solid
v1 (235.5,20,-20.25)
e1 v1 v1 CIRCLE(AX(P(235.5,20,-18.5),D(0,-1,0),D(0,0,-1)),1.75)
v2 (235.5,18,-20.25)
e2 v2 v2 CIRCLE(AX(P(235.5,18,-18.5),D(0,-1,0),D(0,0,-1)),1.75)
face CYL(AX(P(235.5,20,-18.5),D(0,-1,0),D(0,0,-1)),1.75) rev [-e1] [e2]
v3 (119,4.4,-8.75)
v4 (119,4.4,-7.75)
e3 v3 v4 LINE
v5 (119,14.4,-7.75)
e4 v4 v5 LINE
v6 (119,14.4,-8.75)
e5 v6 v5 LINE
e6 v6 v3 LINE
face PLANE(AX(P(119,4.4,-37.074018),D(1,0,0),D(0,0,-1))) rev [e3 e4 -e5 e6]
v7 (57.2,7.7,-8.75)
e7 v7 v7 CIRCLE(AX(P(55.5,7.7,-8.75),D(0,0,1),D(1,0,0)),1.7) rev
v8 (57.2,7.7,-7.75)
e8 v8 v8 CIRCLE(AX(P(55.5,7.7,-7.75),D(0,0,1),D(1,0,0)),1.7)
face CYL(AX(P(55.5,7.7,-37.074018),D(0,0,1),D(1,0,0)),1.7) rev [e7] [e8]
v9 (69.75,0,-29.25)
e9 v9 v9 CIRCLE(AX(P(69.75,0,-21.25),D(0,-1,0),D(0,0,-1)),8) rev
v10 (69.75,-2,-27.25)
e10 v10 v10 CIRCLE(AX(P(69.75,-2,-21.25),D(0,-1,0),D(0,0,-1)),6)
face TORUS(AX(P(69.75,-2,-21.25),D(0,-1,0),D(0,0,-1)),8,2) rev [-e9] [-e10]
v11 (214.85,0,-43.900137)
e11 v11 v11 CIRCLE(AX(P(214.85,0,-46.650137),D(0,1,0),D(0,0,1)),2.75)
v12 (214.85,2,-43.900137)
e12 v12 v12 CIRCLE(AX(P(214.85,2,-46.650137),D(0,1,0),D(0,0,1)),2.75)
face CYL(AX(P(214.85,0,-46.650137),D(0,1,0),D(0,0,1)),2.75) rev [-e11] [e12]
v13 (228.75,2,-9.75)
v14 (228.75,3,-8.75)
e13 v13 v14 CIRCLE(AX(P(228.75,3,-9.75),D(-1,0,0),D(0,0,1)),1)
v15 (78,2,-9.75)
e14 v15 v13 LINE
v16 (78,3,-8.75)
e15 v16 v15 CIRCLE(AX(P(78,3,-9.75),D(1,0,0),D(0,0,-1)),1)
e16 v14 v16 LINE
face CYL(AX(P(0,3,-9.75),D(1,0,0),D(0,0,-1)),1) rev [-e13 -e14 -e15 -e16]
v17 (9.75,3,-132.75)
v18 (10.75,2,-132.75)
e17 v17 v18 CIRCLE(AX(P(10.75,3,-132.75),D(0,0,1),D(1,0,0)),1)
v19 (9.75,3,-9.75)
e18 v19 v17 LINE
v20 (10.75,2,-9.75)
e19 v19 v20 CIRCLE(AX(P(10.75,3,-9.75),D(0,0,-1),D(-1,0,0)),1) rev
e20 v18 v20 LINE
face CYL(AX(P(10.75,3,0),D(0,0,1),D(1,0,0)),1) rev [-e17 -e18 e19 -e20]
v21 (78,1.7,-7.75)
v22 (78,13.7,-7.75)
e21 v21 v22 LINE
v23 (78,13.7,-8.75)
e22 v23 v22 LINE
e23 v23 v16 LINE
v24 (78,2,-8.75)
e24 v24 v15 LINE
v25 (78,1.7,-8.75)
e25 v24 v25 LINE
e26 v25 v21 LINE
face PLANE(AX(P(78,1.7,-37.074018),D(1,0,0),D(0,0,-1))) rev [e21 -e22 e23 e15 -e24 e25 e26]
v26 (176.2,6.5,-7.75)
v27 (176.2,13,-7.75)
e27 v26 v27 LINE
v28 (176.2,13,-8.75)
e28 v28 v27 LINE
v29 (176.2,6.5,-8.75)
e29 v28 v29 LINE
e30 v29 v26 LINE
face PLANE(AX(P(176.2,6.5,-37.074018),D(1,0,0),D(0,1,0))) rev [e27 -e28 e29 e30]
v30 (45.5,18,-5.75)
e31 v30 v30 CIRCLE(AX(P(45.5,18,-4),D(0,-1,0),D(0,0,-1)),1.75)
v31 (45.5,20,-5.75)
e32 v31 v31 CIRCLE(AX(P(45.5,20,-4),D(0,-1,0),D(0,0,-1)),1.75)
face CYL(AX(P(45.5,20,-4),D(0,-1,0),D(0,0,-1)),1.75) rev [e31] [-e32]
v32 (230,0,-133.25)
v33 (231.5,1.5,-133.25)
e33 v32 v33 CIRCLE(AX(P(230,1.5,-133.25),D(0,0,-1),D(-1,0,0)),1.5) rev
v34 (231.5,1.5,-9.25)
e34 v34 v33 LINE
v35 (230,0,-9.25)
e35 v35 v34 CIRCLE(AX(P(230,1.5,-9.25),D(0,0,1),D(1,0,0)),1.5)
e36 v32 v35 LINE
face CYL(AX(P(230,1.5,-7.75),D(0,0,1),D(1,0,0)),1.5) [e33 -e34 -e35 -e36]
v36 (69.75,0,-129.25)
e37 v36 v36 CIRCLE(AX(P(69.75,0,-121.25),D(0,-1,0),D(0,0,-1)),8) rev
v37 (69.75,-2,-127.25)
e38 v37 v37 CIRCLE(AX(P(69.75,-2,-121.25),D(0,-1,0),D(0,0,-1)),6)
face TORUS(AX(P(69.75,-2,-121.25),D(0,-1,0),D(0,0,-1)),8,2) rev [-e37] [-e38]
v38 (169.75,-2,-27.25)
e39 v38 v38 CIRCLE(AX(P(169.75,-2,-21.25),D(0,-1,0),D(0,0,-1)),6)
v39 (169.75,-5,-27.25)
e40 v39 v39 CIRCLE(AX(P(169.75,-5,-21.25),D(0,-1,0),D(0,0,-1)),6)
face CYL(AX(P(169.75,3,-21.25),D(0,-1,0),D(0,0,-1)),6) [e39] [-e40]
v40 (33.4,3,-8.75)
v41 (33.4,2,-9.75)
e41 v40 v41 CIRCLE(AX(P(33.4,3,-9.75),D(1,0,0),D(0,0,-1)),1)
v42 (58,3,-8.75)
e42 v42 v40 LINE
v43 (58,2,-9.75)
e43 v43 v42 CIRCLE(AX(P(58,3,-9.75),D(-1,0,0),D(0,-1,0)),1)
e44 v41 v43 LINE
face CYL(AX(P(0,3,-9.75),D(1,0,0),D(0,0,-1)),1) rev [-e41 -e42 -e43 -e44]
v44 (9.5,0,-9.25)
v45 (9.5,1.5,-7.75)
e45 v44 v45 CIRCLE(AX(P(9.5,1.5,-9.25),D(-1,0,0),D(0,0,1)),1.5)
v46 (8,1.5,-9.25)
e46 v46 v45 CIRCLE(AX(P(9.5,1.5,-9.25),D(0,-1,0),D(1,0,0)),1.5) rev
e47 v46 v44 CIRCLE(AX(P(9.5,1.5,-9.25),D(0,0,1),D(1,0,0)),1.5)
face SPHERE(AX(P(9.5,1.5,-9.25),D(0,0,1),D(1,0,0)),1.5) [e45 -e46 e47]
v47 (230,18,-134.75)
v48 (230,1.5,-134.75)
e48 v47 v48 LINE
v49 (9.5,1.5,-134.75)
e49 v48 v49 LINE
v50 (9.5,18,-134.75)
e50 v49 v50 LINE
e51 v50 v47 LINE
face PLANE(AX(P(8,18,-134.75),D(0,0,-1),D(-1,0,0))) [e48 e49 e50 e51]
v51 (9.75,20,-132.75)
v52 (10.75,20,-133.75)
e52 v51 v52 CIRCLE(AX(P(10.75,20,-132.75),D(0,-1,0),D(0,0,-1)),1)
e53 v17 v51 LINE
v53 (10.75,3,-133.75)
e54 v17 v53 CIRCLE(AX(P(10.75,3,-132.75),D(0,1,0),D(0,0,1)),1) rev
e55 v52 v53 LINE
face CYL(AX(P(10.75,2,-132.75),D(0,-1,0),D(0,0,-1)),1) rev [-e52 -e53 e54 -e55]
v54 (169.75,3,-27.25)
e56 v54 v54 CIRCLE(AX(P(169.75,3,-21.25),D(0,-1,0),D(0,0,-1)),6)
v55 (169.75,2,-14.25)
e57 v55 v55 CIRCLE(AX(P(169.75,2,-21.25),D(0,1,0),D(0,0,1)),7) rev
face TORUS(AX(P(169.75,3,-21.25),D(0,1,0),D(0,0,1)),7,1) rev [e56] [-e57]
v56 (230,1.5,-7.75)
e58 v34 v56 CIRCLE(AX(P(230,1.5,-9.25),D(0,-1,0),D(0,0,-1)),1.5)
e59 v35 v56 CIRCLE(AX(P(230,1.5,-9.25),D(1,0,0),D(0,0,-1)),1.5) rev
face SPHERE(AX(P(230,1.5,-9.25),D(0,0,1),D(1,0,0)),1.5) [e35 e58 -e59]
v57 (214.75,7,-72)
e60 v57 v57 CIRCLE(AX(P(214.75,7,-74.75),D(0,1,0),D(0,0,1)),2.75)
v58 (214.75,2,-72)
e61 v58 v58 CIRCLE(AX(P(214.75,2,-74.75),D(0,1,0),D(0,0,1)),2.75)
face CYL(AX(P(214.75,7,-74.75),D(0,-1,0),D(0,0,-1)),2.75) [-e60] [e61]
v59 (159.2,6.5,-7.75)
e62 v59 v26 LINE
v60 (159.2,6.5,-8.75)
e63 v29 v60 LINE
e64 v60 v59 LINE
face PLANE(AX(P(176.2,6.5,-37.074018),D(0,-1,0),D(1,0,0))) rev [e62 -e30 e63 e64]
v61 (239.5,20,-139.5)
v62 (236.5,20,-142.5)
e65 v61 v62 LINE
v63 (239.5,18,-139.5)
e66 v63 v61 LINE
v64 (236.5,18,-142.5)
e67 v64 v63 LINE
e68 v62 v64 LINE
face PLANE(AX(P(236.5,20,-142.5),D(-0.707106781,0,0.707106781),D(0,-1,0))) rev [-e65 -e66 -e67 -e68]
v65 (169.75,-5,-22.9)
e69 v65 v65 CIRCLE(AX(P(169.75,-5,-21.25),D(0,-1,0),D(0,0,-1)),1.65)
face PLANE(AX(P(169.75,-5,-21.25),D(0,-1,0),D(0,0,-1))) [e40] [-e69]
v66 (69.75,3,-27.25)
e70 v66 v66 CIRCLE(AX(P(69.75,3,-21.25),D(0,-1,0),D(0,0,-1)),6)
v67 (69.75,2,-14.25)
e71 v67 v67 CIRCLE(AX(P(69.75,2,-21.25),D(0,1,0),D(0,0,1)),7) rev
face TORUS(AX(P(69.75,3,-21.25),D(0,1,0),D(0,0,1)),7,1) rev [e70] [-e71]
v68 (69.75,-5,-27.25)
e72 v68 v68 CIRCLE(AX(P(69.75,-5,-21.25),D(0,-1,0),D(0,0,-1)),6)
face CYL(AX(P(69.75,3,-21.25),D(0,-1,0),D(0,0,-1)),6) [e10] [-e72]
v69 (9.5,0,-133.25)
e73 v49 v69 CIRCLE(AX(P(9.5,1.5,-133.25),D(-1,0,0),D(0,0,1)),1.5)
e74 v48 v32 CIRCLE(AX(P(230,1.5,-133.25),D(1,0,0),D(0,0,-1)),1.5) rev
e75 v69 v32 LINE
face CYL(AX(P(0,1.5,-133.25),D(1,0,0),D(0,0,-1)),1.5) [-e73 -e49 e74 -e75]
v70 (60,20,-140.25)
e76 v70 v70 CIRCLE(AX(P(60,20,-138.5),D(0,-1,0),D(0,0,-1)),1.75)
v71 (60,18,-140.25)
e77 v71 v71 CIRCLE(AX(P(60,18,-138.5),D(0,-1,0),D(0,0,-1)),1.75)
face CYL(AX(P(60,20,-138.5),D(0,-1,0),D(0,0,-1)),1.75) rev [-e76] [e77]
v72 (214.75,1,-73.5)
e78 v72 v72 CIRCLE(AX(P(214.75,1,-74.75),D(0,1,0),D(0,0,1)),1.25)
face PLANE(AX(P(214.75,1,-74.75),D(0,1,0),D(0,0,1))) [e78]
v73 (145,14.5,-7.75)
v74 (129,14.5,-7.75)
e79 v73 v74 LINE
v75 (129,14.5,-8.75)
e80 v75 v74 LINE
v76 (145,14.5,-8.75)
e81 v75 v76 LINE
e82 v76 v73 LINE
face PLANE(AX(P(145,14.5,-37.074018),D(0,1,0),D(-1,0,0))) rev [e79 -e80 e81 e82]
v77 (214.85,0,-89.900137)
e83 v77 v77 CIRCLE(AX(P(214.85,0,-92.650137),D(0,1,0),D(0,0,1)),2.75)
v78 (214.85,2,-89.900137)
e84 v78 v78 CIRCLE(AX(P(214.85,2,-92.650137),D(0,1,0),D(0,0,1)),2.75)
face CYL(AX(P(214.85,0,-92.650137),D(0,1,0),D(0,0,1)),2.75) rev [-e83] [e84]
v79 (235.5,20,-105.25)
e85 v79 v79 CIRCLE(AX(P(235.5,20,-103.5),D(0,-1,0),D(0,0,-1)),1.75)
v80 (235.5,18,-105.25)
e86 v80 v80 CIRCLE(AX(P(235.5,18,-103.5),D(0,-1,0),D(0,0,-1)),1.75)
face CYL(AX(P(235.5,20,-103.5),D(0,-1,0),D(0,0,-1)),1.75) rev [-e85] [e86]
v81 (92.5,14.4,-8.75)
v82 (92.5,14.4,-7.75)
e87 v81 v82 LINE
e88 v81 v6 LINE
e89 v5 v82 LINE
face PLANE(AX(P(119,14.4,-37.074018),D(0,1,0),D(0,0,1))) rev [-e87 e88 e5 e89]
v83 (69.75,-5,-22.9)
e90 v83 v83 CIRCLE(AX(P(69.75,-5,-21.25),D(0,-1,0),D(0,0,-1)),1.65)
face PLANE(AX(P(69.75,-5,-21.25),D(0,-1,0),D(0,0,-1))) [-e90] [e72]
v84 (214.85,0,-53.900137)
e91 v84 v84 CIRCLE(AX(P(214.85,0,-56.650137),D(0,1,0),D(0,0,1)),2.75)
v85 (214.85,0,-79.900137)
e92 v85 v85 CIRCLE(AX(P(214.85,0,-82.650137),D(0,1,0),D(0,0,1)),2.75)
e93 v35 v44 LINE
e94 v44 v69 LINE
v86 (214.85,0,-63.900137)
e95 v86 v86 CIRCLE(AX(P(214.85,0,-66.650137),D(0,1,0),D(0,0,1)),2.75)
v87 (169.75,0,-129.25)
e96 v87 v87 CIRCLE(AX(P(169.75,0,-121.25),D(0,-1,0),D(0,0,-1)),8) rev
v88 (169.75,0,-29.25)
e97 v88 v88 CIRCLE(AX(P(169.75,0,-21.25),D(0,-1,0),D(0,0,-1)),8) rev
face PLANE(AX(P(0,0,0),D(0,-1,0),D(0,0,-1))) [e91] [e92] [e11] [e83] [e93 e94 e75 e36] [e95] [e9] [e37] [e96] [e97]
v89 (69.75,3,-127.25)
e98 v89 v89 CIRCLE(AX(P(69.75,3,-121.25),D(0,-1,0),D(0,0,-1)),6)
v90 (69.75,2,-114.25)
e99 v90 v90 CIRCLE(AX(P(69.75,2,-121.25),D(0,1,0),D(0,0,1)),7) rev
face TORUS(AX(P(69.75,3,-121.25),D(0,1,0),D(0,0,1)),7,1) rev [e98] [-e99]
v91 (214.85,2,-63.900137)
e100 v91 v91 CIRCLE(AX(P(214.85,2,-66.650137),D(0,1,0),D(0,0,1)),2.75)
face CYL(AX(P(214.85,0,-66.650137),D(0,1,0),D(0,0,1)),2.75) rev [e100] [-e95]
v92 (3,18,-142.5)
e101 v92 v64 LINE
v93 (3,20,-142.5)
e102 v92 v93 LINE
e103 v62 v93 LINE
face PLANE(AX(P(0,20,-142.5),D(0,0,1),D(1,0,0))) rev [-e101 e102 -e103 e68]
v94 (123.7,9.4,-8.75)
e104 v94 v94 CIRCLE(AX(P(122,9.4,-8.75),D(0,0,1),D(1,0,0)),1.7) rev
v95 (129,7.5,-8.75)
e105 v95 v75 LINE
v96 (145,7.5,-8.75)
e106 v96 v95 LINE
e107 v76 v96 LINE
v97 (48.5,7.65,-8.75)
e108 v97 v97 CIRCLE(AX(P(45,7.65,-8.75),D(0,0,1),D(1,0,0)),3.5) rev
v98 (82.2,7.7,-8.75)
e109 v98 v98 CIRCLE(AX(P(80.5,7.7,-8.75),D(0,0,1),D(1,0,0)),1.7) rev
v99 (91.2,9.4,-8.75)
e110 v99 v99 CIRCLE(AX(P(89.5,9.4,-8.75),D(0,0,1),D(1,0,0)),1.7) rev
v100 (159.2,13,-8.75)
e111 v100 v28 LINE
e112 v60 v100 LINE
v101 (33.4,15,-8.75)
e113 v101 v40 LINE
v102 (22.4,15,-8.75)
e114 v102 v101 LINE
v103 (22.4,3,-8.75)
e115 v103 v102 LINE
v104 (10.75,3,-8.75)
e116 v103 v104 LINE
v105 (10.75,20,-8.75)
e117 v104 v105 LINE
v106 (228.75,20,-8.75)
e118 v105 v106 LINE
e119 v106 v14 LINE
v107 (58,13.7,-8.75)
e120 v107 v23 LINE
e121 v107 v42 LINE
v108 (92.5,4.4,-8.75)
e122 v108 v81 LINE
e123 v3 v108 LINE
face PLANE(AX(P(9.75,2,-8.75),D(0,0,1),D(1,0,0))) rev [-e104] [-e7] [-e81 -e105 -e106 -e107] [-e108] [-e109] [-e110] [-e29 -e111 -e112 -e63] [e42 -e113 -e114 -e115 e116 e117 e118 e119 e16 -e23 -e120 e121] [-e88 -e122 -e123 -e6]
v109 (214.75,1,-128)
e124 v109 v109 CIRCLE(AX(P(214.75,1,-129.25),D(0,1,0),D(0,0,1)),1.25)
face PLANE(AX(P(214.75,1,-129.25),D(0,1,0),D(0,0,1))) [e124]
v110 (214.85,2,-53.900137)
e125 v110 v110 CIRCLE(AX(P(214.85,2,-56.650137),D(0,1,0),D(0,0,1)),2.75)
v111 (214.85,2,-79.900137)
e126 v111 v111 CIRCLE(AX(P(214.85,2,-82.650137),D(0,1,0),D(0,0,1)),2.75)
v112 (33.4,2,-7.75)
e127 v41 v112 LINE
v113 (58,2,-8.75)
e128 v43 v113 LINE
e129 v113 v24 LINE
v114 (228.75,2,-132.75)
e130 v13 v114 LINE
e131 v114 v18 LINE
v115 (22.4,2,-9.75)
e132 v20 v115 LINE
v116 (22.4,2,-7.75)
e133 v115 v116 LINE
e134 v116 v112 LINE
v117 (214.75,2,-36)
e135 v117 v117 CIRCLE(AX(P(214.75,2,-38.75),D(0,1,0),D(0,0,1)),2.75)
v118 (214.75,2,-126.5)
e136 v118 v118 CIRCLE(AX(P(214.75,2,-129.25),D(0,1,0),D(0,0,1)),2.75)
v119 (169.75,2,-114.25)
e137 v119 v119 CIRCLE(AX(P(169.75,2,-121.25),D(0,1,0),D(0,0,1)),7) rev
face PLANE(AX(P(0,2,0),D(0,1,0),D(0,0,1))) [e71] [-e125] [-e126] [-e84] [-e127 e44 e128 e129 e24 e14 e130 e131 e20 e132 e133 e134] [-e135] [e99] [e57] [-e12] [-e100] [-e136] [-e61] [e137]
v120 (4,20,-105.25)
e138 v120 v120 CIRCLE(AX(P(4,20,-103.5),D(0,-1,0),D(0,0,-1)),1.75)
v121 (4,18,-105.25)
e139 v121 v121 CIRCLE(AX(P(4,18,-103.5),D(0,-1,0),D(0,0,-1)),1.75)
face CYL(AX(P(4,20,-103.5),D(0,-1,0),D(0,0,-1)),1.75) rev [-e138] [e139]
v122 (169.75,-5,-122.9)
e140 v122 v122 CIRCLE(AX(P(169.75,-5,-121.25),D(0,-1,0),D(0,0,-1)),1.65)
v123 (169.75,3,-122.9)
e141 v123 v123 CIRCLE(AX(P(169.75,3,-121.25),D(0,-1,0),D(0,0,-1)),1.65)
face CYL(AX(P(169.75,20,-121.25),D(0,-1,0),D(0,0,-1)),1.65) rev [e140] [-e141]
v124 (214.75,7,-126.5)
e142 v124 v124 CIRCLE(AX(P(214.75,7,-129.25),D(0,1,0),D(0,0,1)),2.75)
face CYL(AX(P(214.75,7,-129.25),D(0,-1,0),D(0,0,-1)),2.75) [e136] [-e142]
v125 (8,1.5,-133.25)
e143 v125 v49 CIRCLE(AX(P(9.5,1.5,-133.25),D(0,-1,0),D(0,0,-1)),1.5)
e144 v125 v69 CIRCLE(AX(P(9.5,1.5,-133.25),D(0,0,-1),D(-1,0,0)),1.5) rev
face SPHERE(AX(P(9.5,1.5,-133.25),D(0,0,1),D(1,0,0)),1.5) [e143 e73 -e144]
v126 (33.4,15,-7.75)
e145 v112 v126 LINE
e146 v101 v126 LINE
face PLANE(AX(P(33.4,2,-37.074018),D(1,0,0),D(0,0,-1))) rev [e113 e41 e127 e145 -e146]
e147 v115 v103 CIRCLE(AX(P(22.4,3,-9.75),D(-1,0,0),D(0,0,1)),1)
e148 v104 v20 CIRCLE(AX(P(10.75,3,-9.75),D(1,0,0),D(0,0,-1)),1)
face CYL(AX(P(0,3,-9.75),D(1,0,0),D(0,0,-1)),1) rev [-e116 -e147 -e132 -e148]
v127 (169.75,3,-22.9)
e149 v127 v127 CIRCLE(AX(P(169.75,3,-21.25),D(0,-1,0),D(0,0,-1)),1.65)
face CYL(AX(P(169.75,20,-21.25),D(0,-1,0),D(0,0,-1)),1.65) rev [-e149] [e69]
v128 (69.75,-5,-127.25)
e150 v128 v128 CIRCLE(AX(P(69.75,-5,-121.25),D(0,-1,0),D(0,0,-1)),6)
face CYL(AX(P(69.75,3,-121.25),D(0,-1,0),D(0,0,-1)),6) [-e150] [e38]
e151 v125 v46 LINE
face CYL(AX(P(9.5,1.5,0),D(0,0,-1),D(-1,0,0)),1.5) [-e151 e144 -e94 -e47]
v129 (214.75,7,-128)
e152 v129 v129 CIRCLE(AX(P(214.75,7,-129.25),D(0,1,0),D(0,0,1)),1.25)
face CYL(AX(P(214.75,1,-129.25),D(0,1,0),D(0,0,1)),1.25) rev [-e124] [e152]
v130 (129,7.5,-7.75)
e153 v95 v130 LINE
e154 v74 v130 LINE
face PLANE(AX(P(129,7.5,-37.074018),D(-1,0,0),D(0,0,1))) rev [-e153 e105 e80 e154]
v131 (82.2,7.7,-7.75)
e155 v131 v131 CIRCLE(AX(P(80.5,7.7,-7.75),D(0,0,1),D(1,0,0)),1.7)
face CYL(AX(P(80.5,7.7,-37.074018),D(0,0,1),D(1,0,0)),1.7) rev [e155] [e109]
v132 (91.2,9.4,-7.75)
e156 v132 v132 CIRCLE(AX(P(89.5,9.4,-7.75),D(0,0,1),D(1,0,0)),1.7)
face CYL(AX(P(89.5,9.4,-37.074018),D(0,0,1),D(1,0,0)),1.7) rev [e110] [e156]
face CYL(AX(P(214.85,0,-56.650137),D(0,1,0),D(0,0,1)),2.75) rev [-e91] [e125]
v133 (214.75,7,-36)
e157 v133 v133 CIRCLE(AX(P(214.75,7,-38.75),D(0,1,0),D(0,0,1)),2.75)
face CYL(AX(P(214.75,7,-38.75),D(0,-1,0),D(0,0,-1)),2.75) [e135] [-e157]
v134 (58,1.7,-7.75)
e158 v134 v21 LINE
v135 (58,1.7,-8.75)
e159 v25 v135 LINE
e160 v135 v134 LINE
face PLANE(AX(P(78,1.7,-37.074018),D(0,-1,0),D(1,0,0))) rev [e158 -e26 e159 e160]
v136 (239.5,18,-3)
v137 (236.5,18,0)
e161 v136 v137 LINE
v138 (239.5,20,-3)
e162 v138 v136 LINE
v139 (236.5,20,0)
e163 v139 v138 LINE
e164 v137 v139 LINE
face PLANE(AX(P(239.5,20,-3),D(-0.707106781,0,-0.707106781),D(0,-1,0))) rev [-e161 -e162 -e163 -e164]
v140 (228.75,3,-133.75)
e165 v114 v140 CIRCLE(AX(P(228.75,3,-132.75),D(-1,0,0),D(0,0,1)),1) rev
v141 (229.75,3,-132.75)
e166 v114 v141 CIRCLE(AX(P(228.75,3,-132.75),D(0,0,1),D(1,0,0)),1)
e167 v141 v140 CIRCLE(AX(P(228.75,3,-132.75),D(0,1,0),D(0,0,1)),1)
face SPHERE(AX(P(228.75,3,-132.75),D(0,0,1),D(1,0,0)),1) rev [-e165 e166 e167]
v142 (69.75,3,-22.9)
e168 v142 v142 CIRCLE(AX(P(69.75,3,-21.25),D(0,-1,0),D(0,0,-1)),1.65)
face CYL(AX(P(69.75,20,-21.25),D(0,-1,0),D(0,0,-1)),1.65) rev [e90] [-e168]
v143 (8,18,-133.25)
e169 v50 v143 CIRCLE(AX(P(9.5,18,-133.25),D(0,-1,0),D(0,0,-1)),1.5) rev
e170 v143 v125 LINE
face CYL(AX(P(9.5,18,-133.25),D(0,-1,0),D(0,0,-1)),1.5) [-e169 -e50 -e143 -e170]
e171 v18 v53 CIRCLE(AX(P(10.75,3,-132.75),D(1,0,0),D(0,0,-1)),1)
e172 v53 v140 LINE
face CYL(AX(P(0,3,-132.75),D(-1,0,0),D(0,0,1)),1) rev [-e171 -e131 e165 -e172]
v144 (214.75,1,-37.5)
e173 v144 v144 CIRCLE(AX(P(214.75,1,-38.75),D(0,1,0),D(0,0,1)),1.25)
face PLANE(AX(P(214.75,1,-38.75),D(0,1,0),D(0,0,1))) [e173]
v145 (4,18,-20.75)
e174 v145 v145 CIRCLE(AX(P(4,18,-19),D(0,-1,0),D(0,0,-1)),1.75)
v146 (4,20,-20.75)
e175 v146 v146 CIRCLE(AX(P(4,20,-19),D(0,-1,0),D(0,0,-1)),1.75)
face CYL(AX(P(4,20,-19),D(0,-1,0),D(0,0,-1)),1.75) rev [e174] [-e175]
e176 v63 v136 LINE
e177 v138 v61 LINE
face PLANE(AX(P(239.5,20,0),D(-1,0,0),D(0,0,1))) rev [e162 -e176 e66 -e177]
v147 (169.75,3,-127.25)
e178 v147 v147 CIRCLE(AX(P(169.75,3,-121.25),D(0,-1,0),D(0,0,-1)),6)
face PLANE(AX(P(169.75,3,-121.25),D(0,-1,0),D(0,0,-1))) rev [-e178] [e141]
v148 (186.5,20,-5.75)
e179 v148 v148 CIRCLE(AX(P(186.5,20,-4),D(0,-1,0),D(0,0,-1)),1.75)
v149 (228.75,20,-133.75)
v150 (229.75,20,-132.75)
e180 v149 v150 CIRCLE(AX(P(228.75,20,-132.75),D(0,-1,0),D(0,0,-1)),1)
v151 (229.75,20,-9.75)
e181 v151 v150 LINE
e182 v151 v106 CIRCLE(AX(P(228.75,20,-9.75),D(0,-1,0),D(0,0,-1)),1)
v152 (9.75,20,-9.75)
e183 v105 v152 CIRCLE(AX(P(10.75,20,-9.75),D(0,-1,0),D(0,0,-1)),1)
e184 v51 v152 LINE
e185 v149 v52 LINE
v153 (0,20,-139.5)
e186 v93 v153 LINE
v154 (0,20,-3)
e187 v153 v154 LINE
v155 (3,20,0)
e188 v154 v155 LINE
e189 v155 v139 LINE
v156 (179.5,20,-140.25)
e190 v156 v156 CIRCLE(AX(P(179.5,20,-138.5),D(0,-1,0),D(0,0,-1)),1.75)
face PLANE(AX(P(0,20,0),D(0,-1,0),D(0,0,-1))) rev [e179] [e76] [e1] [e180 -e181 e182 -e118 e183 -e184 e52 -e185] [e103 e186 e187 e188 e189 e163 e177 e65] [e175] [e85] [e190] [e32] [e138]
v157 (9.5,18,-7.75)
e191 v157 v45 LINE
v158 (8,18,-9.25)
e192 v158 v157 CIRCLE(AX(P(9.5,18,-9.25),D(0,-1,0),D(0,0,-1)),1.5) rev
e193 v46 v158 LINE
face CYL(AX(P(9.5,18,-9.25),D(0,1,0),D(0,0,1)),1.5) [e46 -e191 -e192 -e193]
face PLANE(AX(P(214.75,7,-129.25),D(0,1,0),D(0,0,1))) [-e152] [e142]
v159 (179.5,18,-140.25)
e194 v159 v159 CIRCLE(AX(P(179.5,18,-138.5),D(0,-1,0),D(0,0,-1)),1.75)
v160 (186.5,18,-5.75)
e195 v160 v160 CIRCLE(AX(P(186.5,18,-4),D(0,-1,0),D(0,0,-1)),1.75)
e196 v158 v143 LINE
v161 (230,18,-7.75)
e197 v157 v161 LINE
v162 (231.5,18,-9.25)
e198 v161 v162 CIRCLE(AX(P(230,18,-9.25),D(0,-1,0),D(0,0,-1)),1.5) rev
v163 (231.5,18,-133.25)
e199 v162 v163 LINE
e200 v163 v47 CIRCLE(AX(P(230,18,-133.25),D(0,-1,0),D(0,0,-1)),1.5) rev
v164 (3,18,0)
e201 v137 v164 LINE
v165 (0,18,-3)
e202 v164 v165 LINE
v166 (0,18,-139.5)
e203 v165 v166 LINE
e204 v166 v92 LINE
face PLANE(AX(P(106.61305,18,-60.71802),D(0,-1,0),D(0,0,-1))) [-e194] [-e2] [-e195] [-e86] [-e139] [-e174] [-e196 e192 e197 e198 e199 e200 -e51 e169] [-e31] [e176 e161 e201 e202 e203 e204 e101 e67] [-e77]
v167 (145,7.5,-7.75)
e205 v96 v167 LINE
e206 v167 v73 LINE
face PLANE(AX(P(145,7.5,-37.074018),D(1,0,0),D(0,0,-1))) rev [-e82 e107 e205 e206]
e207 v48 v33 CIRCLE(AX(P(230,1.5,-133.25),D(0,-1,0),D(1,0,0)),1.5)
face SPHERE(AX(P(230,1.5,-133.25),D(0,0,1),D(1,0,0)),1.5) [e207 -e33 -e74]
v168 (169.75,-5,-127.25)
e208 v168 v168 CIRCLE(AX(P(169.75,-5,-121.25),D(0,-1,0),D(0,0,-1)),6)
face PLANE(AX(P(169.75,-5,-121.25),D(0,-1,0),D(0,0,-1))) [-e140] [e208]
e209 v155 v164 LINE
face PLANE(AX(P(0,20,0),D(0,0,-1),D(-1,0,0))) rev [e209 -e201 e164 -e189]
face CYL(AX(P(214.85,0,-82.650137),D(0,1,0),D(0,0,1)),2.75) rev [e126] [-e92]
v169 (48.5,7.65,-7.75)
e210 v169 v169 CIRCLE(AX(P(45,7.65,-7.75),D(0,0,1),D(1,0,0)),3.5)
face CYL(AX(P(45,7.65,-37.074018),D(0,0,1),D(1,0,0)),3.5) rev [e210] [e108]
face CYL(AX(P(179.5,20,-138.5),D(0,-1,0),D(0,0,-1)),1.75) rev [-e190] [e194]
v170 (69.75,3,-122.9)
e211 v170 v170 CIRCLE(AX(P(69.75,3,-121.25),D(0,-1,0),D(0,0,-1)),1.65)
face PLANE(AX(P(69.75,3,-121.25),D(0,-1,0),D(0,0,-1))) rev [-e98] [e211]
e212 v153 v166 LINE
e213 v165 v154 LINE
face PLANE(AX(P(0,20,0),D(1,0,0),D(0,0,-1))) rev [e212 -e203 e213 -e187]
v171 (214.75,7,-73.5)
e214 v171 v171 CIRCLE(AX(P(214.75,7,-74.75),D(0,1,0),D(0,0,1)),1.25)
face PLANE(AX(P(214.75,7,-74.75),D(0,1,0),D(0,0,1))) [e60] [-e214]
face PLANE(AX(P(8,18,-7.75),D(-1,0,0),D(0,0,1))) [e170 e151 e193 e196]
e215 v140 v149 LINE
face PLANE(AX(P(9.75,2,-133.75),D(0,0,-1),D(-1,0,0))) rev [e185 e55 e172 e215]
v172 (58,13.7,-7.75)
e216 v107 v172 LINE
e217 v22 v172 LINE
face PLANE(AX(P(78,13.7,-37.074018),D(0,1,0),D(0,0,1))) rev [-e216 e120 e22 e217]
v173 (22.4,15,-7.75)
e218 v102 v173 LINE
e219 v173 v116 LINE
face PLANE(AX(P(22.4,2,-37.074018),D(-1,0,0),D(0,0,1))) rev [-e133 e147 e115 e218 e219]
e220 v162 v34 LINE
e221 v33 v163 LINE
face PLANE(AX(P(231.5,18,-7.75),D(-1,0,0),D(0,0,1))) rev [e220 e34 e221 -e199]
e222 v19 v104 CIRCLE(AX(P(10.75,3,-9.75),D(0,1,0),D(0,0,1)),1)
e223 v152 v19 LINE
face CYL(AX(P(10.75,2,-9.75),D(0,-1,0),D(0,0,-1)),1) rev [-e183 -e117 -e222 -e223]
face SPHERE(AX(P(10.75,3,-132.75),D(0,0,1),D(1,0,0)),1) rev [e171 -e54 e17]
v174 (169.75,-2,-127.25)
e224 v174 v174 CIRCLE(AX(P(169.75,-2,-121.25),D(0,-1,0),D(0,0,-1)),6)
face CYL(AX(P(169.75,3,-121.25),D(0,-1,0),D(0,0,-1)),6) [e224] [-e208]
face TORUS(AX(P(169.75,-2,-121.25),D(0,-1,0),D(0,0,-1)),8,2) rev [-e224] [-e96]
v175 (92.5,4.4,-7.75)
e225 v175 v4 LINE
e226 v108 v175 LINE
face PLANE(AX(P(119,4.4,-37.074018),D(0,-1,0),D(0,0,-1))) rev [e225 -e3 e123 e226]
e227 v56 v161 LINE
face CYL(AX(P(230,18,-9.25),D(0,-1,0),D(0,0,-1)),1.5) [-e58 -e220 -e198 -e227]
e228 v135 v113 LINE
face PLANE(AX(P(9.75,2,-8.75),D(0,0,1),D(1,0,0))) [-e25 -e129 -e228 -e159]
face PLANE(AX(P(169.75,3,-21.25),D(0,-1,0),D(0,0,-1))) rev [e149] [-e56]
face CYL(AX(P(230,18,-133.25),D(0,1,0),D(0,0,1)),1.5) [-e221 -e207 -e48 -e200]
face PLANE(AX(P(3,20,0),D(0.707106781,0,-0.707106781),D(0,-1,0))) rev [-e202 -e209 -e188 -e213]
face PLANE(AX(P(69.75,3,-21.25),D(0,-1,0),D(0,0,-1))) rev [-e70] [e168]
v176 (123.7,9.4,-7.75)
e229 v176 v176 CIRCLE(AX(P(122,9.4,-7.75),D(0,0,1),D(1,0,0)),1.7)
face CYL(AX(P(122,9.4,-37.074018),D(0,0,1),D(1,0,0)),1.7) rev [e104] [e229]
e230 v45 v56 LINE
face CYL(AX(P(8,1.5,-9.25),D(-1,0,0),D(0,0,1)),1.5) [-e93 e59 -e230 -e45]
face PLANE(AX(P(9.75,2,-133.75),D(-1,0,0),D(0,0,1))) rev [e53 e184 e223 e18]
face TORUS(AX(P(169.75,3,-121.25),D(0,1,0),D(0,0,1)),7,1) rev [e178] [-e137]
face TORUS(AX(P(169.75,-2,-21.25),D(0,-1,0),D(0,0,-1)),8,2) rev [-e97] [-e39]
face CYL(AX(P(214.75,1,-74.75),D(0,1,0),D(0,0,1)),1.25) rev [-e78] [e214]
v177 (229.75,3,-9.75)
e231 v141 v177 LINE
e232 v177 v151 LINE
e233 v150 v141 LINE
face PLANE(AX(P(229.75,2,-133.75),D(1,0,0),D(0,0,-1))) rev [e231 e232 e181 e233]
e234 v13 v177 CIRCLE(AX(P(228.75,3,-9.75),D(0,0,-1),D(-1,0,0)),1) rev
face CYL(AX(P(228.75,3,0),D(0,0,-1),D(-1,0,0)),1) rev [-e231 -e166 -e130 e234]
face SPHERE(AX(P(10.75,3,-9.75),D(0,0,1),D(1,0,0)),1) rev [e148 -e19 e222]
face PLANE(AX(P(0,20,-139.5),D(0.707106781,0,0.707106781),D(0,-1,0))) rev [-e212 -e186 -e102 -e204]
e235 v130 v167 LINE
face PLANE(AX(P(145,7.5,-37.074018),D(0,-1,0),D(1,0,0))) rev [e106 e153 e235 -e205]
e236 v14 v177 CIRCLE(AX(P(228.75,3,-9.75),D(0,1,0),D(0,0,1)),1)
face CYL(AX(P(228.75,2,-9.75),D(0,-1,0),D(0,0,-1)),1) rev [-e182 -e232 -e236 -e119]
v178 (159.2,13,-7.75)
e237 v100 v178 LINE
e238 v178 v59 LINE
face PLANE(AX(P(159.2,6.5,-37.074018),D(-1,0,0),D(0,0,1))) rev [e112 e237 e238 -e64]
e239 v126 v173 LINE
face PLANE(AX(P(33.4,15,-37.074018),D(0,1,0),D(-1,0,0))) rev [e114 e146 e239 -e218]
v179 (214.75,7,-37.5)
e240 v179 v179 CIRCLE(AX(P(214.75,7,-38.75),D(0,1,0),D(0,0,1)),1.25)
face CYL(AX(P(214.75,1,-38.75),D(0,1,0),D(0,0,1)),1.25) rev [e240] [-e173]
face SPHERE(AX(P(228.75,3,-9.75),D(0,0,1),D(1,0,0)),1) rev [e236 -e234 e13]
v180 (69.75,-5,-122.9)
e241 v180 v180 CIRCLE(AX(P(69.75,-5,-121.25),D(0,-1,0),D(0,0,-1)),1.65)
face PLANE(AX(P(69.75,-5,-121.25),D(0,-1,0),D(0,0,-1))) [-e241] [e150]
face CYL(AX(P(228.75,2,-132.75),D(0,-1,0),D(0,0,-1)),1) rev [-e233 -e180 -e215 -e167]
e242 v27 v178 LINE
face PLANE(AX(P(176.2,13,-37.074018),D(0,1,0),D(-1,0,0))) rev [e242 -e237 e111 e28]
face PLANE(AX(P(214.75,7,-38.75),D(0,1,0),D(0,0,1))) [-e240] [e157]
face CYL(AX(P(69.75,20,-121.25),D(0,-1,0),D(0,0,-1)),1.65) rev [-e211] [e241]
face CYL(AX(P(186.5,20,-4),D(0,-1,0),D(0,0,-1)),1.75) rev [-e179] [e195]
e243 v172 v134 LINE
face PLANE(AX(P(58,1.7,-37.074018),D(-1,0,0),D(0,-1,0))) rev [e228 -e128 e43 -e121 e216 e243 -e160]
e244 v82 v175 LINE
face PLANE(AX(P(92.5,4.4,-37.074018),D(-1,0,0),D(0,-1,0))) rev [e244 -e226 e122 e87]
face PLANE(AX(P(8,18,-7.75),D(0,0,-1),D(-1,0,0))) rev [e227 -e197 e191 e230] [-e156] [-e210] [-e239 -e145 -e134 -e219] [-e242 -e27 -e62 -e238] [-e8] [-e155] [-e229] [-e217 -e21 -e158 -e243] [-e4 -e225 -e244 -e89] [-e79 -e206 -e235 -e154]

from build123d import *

# Parameters (mm, degrees)
SKETCH1_W                = 239.5
SKETCH1_H                = 142.5
BOSS_EXTRUDE1_DEPTH      = 20
SKETCH2_OUTSIDE_W        = 297.38
SKETCH2_OUTSIDE_H        = 200.38
SKETCH2_OUTSIDE_W_2      = 223.5
SKETCH2_OUTSIDE_H_2      = 127
CUT_EXTRUDE1_DEPTH       = 18
SKETCH3_W                = 220
SKETCH3_H                = 125
CUT_EXTRUDE2_DEPTH       = 18
SKETCH4_R                = 2.75
BOSS_EXTRUDE3_DEPTH      = 5
SKETCH5_R                = 1.25
CUT_EXTRUDE3_DEPTH       = 6
SKETCH6_R                = 2.75
CUT_EXTRUDE4_DEPTH       = 280.267792629
SKETCH7_R                = 1.75
CUT_EXTRUDE5_DEPTH       = 280.267792629
SKETCH8_R                = 1.7
SKETCH8_R_2              = 3.5
SKETCH8_W                = 17
SKETCH8_H                = 6.5
SKETCH8_W_2              = 16
SKETCH8_H_2              = 7
SKETCH8_W_3              = 26.5
SKETCH8_H_3              = 10
SKETCH8_W_4              = 20
SKETCH8_H_4              = 12
SKETCH8_W_5              = 11
SKETCH8_H_5              = 13
CUT_EXTRUDE6_DEPTH       = 1
CHAMFER1_SIZE            = 3
BOSS_EXTRUDE4_DEPTH      = 5
BOSS_EXTRUDE4_DEPTH_BACK = 3
SKETCH9_R                = 6
SKETCH10_R               = 1.65
CUT_EXTRUDE7_DEPTH       = 280.80618292
FILLET1_R                = 2
FILLET2_R                = 1
FILLET3_R                = 1.5
FILLET4_R                = 1


with BuildPart() as part:
    # Sketch1 → Boss-Extrude1 (new body)
    with BuildSketch(Plane(origin=(0, 0, 0), x_dir=(1, 0, 0), z_dir=(0, 1, 0))):
        with Locations((119.75, 71.25)):
            Rectangle(SKETCH1_W, SKETCH1_H)
    extrude(amount=BOSS_EXTRUDE1_DEPTH)

    # Sketch2 outside → Cut-Extrude1 (cut)
    with BuildSketch(Plane.XZ):
        with Locations((119.75, -71.25)):
            Rectangle(SKETCH2_OUTSIDE_W, SKETCH2_OUTSIDE_H)
        with Locations((119.75, -71.25)):
            Rectangle(SKETCH2_OUTSIDE_W_2, SKETCH2_OUTSIDE_H_2, mode=Mode.SUBTRACT)
    extrude(amount=-CUT_EXTRUDE1_DEPTH, mode=Mode.SUBTRACT)

    # Sketch3 → Cut-Extrude2 (cut)
    with BuildSketch(Plane(origin=(0, 20, 0), x_dir=(1, 0, 0), z_dir=(0, 1, 0))):
        with Locations((119.75, 71.25)):
            Rectangle(SKETCH3_W, SKETCH3_H)
    extrude(amount=-CUT_EXTRUDE2_DEPTH, mode=Mode.SUBTRACT)

    # Sketch4 → Boss-Extrude3 (add)
    with BuildSketch(Plane(origin=(0, 2, 0), x_dir=(1, 0, 0), z_dir=(0, 1, 0))):
        with Locations(Location((214.75, 129.25, 0), (0, 0, 270))):
            Circle(SKETCH4_R)
        with Locations(Location((214.75, 74.75, 0), (0, 0, 270))):
            Circle(SKETCH4_R)
        with Locations(Location((214.75, 38.75, 0), (0, 0, 270))):
            Circle(SKETCH4_R)
    extrude(amount=BOSS_EXTRUDE3_DEPTH)

    # Sketch5 → Cut-Extrude3 (cut)
    with BuildSketch(Plane(origin=(0, 7, 0), x_dir=(1, 0, 0), z_dir=(0, 1, 0))):
        with Locations(Location((214.75, 129.25, 0), (0, 0, 270))):
            Circle(SKETCH5_R)
        with Locations(Location((214.75, 74.75, 0), (0, 0, 270))):
            Circle(SKETCH5_R)
        with Locations(Location((214.75, 38.75, 0), (0, 0, 270))):
            Circle(SKETCH5_R)
    extrude(amount=-CUT_EXTRUDE3_DEPTH, mode=Mode.SUBTRACT)

    # Sketch6 → Cut-Extrude4 (cut, through all)
    with BuildSketch(Plane(origin=(0, 2, 0), x_dir=(1, 0, 0), z_dir=(0, 1, 0))):
        with Locations(Location((214.85, 92.650136612, 0), (0, 0, 270))):
            Circle(SKETCH6_R)
        with Locations(Location((214.85, 82.650136612, 0), (0, 0, 270))):
            Circle(SKETCH6_R)
        with Locations(Location((214.85, 66.650136612, 0), (0, 0, 270))):
            Circle(SKETCH6_R)
        with Locations(Location((214.85, 56.650136612, 0), (0, 0, 270))):
            Circle(SKETCH6_R)
        with Locations(Location((214.85, 46.650136612, 0), (0, 0, 270))):
            Circle(SKETCH6_R)
    extrude(amount=-CUT_EXTRUDE4_DEPTH, mode=Mode.SUBTRACT)

    # Sketch7 → Cut-Extrude5 (cut, through all)
    with BuildSketch(Plane.XZ.offset(-18)):
        with Locations(Location((179.5, -138.5, 0), (0, 0, 270))):
            Circle(SKETCH7_R)
        with Locations(Location((60, -138.5, 0), (0, 0, 270))):
            Circle(SKETCH7_R)
        with Locations(Location((235.5, -103.5, 0), (0, 0, 270))):
            Circle(SKETCH7_R)
        with Locations(Location((235.5, -18.5, 0), (0, 0, 270))):
            Circle(SKETCH7_R)
        with Locations(Location((186.5, -4, 0), (0, 0, 270))):
            Circle(SKETCH7_R)
        with Locations(Location((45.5, -4, 0), (0, 0, 270))):
            Circle(SKETCH7_R)
        with Locations(Location((4, -19, 0), (0, 0, 270))):
            Circle(SKETCH7_R)
        with Locations(Location((4, -103.5, 0), (0, 0, 270))):
            Circle(SKETCH7_R)
    extrude(amount=-CUT_EXTRUDE5_DEPTH, mode=Mode.SUBTRACT)

    # Sketch8 → Cut-Extrude6 (cut)
    with BuildSketch(Plane.XY.offset(-7.75)):
        with Locations((55.5, 7.7)):
            Circle(SKETCH8_R)
        with Locations((80.5, 7.7)):
            Circle(SKETCH8_R)
        with Locations((45, 7.65)):
            Circle(SKETCH8_R_2)
        with Locations((89.5, 9.4)):
            Circle(SKETCH8_R)
        with Locations((122, 9.4)):
            Circle(SKETCH8_R)
        with Locations((167.7, 9.75)):
            Rectangle(SKETCH8_W, SKETCH8_H)
        with Locations((137, 11)):
            Rectangle(SKETCH8_W_2, SKETCH8_H_2)
        with Locations((105.75, 9.4)):
            Rectangle(SKETCH8_W_3, SKETCH8_H_3)
        with Locations((68, 7.7)):
            Rectangle(SKETCH8_W_4, SKETCH8_H_4)
        with Locations((27.9, 8.5)):
            Rectangle(SKETCH8_W_5, SKETCH8_H_5)
    extrude(amount=-CUT_EXTRUDE6_DEPTH, mode=Mode.SUBTRACT)

    # Chamfer1
    chamfer1_edges = [part.edges().sort_by_distance(p)[0] for p in [
        (0, 19, -142.5),
        (239.5, 19, -142.5),
        (239.5, 19, 0),
        (0, 19, 0),
    ]]
    chamfer(chamfer1_edges, length=CHAMFER1_SIZE)

    # Sketch9 → Boss-Extrude4 (add, two sides: drawn at the far end of the back side and taken through both)
    with BuildSketch(Plane.XZ.offset(-BOSS_EXTRUDE4_DEPTH_BACK)):
        with Locations(Location((69.75, -121.25, 0), (0, 0, 270))):
            Circle(SKETCH9_R)
        with Locations(Location((169.75, -121.25, 0), (0, 0, 270))):
            Circle(SKETCH9_R)
        with Locations(Location((69.75, -21.25, 0), (0, 0, 270))):
            Circle(SKETCH9_R)
        with Locations(Location((169.75, -21.25, 0), (0, 0, 270))):
            Circle(SKETCH9_R)
    extrude(amount=BOSS_EXTRUDE4_DEPTH + BOSS_EXTRUDE4_DEPTH_BACK)

    # Sketch10 → Cut-Extrude7 (cut, through all)
    with BuildSketch(Plane.XZ.offset(5)):
        with Locations(Location((69.75, -121.25, 0), (0, 0, 270))):
            Circle(SKETCH10_R)
        with Locations(Location((169.75, -121.25, 0), (0, 0, 270))):
            Circle(SKETCH10_R)
        with Locations(Location((169.75, -21.25, 0), (0, 0, 270))):
            Circle(SKETCH10_R)
        with Locations(Location((69.75, -21.25, 0), (0, 0, 270))):
            Circle(SKETCH10_R)
    extrude(amount=-CUT_EXTRUDE7_DEPTH, mode=Mode.SUBTRACT)

    # Fillet1
    fillet1_edges = [part.edges().sort_by_distance(p)[0] for p in [
        (69.75, 0, -115.25),
        (169.75, 0, -115.25),
        (69.75, 0, -15.25),
        (169.75, 0, -15.25),
    ]]
    fillet(fillet1_edges, radius=FILLET1_R)

    # Fillet2
    fillet2_edges = [part.edges().sort_by_distance(p)[0] for p in [
        (153.875, 2, -8.75),
        (45.7, 2, -8.75),
        (9.75, 2, -71.25),
        (9.75, 11, -8.75),
        (119.75, 2, -133.75),
        (9.75, 11, -133.75),
        (229.75, 2, -71.25),
        (229.75, 11, -133.75),
        (16.075, 2, -8.75),
        (229.75, 11, -8.75),
    ]]
    fillet(fillet2_edges, radius=FILLET2_R)

    # Fillet3
    fillet3_edges = [part.edges().sort_by_distance(p)[0] for p in [
        (119.75, 0, -7.75),
        (231.5, 0, -71.25),
        (231.5, 9, -7.75),
        (231.5, 9, -134.75),
        (119.75, 0, -134.75),
        (8, 9, -134.75),
        (8, 0, -71.25),
        (8, 9, -7.75),
    ]]
    fillet(fillet3_edges, radius=FILLET3_R)

    # Fillet4
    fillet4_edges = [part.edges().sort_by_distance(p)[0] for p in [
        (69.75, 2, -115.25),
        (169.75, 2, -115.25),
        (69.75, 2, -15.25),
        (169.75, 2, -15.25),
    ]]
    fillet(fillet4_edges, radius=FILLET4_R - 0.0001)  # a hair under: the kernel refuses the full size


solid = part.part
